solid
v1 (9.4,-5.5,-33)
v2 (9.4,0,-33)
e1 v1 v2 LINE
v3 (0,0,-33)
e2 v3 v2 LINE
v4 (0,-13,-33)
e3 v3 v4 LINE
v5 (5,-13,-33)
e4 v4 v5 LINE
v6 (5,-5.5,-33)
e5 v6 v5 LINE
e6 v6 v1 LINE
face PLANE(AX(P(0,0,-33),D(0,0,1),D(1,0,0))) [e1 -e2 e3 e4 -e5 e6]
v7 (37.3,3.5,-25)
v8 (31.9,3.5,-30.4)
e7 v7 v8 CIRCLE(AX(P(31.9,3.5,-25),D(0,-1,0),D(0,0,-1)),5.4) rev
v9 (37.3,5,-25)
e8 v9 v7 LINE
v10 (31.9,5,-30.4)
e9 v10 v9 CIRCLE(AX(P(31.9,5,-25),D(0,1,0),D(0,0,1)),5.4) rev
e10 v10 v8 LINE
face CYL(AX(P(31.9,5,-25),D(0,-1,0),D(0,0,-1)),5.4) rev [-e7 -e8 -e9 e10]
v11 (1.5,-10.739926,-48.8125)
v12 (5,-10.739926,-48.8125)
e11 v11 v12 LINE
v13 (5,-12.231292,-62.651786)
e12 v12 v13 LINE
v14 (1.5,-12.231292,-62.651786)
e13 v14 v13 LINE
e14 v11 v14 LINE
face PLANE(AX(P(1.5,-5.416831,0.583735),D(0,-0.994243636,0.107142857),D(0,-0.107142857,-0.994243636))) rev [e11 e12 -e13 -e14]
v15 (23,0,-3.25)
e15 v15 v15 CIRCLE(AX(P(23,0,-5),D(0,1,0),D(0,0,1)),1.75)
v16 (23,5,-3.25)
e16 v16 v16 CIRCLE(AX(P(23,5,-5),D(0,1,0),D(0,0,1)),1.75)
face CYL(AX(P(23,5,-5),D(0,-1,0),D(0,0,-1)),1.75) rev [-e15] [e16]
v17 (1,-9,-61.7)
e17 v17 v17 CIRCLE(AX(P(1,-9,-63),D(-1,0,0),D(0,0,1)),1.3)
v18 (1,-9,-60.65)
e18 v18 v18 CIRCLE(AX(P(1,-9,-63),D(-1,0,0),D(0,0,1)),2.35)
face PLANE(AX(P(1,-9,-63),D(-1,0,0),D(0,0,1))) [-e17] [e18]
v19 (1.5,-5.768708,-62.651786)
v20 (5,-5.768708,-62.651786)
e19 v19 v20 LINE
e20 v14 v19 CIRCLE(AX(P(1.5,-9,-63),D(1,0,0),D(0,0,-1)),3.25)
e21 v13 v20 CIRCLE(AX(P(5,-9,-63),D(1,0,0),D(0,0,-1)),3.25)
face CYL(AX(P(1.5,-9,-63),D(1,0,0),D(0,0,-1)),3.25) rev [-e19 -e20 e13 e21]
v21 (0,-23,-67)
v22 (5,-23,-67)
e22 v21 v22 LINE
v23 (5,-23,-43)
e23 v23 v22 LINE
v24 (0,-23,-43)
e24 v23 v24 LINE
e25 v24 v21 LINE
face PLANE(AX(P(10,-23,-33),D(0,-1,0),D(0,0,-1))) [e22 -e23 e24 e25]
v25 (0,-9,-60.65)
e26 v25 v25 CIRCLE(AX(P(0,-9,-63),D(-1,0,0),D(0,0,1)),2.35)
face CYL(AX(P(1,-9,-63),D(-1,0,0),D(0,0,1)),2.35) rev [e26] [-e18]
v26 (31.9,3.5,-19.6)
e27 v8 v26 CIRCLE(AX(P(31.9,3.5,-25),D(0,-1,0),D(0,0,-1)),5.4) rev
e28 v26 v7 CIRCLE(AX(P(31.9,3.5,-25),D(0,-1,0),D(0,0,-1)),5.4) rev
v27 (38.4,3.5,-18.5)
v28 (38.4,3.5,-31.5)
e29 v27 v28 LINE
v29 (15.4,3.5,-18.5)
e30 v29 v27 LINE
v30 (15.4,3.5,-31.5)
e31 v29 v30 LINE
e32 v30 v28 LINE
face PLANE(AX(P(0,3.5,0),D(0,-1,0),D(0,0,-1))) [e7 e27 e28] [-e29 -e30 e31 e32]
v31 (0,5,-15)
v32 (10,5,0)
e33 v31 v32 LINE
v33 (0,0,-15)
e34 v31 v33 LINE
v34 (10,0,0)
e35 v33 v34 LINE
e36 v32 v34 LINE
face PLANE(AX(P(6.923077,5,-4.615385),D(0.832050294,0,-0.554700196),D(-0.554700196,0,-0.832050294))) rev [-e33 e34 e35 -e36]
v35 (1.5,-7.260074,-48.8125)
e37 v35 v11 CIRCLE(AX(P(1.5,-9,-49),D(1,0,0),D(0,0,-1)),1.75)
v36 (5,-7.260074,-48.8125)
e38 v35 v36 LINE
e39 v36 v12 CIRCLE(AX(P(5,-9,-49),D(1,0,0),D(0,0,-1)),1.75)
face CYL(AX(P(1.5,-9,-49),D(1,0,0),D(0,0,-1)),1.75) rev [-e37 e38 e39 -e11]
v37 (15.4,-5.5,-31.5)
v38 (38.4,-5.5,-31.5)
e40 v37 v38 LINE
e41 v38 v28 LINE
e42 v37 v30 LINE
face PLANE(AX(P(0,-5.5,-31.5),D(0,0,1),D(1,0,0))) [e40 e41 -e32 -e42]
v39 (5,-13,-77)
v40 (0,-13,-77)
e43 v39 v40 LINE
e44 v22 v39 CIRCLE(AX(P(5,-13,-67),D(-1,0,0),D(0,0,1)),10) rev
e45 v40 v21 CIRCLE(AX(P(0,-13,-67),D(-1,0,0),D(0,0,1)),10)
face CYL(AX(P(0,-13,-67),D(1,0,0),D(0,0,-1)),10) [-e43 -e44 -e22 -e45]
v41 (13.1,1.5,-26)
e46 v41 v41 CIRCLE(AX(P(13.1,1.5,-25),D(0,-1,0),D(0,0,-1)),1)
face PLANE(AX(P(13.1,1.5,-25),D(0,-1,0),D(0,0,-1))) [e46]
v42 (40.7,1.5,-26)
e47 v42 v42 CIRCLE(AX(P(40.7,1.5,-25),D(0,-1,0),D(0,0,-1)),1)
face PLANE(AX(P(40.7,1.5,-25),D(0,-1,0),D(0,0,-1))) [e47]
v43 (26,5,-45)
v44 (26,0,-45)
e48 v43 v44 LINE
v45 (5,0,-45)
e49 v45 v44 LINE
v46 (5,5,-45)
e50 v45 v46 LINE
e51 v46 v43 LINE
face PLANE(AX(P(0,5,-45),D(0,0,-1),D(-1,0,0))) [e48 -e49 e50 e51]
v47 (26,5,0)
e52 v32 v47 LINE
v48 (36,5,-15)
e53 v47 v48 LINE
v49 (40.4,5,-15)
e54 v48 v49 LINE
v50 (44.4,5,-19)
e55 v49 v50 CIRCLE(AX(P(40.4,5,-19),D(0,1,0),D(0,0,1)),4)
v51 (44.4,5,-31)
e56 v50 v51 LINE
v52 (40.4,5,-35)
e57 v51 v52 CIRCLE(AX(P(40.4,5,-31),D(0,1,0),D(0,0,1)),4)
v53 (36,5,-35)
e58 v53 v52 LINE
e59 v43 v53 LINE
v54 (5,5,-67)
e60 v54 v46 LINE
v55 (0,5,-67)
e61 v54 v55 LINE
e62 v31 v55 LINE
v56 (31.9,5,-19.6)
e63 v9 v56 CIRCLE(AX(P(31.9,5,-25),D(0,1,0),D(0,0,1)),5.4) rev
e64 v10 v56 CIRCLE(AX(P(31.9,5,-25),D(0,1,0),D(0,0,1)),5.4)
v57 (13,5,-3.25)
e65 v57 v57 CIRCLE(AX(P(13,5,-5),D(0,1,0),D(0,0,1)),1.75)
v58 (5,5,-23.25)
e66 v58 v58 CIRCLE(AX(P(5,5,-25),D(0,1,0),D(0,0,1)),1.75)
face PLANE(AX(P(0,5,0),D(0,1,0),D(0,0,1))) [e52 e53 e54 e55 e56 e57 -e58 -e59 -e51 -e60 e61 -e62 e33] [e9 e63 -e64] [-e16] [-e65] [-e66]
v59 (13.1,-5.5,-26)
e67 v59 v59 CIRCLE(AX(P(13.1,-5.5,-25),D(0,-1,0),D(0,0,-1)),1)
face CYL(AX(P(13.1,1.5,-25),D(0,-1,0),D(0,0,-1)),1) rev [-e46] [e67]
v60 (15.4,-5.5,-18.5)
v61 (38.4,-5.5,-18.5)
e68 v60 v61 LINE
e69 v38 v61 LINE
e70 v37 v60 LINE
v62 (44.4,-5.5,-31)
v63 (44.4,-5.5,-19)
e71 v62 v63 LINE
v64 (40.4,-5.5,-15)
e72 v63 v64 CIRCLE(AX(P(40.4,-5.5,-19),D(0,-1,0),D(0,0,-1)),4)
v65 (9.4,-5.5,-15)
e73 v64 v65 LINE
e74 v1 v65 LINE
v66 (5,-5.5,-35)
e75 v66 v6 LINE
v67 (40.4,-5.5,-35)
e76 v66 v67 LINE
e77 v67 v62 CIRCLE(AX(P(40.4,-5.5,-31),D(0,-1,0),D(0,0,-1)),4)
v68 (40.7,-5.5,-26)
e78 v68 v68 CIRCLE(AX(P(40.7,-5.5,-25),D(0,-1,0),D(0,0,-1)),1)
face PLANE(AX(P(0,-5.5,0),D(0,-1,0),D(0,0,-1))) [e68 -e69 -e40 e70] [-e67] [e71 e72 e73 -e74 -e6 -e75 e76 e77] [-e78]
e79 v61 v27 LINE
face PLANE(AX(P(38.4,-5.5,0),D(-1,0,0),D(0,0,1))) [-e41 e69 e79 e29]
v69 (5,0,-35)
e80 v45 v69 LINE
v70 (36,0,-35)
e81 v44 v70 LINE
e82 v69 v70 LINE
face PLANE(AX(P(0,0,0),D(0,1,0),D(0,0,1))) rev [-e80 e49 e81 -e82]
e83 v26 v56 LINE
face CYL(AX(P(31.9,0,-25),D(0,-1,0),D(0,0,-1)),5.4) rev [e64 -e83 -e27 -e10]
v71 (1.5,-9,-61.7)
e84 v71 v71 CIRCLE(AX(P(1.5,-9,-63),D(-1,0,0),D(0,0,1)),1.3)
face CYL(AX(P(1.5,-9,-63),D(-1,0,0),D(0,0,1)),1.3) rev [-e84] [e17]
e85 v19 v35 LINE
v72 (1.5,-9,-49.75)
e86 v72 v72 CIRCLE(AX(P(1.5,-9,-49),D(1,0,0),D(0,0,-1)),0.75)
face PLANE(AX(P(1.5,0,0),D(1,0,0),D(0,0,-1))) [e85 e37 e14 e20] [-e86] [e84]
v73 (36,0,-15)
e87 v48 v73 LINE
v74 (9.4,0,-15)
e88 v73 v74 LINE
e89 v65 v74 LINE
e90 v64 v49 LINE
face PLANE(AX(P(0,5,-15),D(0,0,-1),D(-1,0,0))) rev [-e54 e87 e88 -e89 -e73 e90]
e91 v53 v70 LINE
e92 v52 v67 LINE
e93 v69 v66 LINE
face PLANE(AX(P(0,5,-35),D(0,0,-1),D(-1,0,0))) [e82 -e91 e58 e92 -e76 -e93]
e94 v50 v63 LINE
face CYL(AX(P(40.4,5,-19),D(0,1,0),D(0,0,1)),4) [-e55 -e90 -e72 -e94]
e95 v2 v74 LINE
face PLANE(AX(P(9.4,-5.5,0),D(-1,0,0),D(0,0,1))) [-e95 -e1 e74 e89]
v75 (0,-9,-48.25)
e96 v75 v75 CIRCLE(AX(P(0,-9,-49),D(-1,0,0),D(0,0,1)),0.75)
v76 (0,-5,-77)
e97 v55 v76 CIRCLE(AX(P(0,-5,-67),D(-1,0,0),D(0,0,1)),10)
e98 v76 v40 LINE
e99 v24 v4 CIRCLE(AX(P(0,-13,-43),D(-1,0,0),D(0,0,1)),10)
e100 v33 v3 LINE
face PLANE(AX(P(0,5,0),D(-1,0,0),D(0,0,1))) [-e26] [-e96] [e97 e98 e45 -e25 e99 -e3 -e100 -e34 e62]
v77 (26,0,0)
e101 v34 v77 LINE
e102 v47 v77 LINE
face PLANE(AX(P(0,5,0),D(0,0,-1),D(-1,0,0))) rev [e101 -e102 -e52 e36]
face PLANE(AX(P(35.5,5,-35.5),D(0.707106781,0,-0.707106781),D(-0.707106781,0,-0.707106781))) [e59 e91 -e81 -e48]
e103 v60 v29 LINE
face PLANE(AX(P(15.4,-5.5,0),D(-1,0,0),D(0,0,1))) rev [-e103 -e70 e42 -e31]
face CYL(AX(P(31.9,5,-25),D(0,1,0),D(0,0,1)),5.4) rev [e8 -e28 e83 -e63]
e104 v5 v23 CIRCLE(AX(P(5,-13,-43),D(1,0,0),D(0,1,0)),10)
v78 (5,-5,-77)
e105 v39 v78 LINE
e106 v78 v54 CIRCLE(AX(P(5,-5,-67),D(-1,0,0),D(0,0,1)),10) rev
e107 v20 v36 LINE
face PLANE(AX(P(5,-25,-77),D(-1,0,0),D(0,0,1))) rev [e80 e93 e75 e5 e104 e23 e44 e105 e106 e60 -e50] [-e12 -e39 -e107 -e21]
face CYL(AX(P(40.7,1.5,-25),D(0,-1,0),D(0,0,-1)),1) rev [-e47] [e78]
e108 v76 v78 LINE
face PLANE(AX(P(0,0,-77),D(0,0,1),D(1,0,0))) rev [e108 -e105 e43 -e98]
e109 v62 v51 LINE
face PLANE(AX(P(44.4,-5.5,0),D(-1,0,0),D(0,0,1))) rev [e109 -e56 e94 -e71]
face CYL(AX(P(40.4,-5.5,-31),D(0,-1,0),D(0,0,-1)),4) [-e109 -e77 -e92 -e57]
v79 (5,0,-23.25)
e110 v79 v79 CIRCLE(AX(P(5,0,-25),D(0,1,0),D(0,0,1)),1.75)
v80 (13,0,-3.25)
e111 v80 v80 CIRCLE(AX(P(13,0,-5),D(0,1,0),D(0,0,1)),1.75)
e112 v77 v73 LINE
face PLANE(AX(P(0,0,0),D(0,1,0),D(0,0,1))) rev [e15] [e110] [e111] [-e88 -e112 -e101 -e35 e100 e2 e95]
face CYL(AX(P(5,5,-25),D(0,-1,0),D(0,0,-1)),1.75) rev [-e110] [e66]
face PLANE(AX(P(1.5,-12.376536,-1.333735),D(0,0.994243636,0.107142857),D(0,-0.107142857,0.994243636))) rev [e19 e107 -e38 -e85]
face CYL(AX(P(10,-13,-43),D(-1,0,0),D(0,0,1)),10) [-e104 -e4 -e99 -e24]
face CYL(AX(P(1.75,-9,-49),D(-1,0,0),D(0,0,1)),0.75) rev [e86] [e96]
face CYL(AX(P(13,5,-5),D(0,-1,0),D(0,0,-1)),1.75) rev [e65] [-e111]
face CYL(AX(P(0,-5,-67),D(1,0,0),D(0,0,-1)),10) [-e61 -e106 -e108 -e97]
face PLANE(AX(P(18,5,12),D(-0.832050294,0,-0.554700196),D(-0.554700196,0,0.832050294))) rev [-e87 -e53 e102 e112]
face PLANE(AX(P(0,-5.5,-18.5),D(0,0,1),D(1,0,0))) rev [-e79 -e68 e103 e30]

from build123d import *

# Parameters (mm, degrees)
SKETCH1_R                = 1.75
SKETCH1_W                = 7.2
SKETCH1_H                = 5.4
BOSS_EXTRUDE1_DEPTH      = 5
FILLET5_RADIUS           = 10
FILLET5_LENGTH           = 5
FILLET2_R                = 5.4
FILLET6_R                = 5.4
SKETCH3_W                = 6
SKETCH3_H                = 13
BOSS_EXTRUDE4_DEPTH      = 5.5
SKETCH5_W                = 23
SKETCH5_H                = 13
CUT_EXTRUDE1_DEPTH       = 3.5
CUT_EXTRUDE2_DEPTH       = 76.201396264
FILLET9_R                = 4
BOSS_EXTRUDE7_DEPTH      = 32
BOSS_EXTRUDE7_DEPTH_BACK = 12
SKETCH7_W                = 10
SKETCH7_H                = 28
FILLET10_R               = 10
SKETCH9_R                = 1
CUT_EXTRUDE4_DEPTH       = 7
SKETCH15_W               = 5
SKETCH15_H               = 32
CUT_EXTRUDE7_DEPTH       = 30
CUT_EXTRUDE8_DEPTH       = 5
CUT_EXTRUDE9_DEPTH       = 3.5
SKETCH22_R               = 1.3
CUT_EXTRUDE10_DEPTH      = 1.5
SKETCH22_3_R             = 2.35
SKETCH22_3_R_2           = 1.3
CUT_EXTRUDE11_DEPTH      = 1
SKETCH23_R               = 0.75
CUT_EXTRUDE12_DEPTH      = 1.75


with BuildPart() as part:
    # Sketch1 → Boss-Extrude1 (new body)
    # profile 1 of 4: a face of its own
    with BuildSketch(Plane(origin=(0, 0, 0), x_dir=(1, 0, 0), z_dir=(0, 1, 0))):
        with BuildLine():
            Line((3.25, 25), (0, 25))
            Line((0, 25), (0, 15))
            Line((0, 15), (10, 0))
            Line((10, 0), (26, 0))
            Line((26, 0), (36, 15))
            Line((36, 15), (60, 15))
            Line((60, 15), (60, 25))
            Line((60, 25), (44.5, 25))
            Line((44.5, 25), (44.5, 19.6))
            Line((44.5, 19.6), (37.3, 19.6))
            Line((37.3, 19.6), (26.5, 19.6))
            Line((26.5, 19.6), (26.5, 25))
            Line((26.5, 25), (6.75, 25))
            ThreePointArc((6.75, 25), (5, 23.25), (3.25, 25))
        make_face()
        with Locations(Location((13, 5, 0), (0, 0, 270))):
            Circle(SKETCH1_R, mode=Mode.SUBTRACT)
        with Locations(Location((23, 5, 0), (0, 0, 270))):
            Circle(SKETCH1_R, mode=Mode.SUBTRACT)
    # profile 2 of 4: a face of its own
    with BuildSketch(Plane(origin=(0, 0, 0), x_dir=(1, 0, 0), z_dir=(0, 1, 0))):
        with BuildLine():
            Line((10, 45), (0, 33.819660113))
            Line((0, 33.819660113), (0, 25))
            Line((0, 25), (3.25, 25))
            ThreePointArc((3.25, 25), (5, 26.75), (6.75, 25))
            Line((6.75, 25), (26.5, 25))
            Line((26.5, 25), (26.5, 30.4))
            Line((26.5, 30.4), (37.3, 30.4))
            Line((37.3, 30.4), (44.5, 30.4))
            Line((44.5, 30.4), (44.5, 25))
            Line((44.5, 25), (60, 25))
            Line((60, 25), (60, 35))
            Line((60, 35), (36, 35))
            Line((36, 35), (26, 45))
            Line((26, 45), (10, 45))
        make_face()
    # profile 3 of 4: a face of its own
    with BuildSketch(Plane(origin=(0, 0, 0), x_dir=(1, 0, 0), z_dir=(0, 1, 0))):
        with Locations((40.9, 27.7)):
            Rectangle(SKETCH1_W, SKETCH1_H)
    # profile 4 of 4: a face of its own
    with BuildSketch(Plane(origin=(0, 0, 0), x_dir=(1, 0, 0), z_dir=(0, 1, 0))):
        with Locations((40.9, 22.3)):
            Rectangle(SKETCH1_W, SKETCH1_H)
    extrude(amount=BOSS_EXTRUDE1_DEPTH)

    # Fillet5: full round fillet: the end face becomes a half cylinder, R = half its width
    fillet5_face = Plane((60, 2.5, -25), x_dir=(0, -1, 0), z_dir=(1, 0, 0))  # on the end face: x along it, z out of the body
    fillet5_slab = fillet5_face.offset(-FILLET5_RADIUS / 2) * Box(FILLET5_LENGTH, 2 * FILLET5_RADIUS, FILLET5_RADIUS, mode=Mode.PRIVATE)  # the body's end, R deep
    fillet5_round = Plane((50, 2.5, -25), x_dir=(1, 0, 0), z_dir=(0, -1, 0)) * Cylinder(FILLET5_RADIUS, FILLET5_LENGTH, mode=Mode.PRIVATE)  # its axis R under the face
    add(fillet5_slab - fillet5_round, mode=Mode.SUBTRACT)

    # Fillet2
    fillet2_edges = [part.edges().sort_by_distance(p)[0] for p in [
        (26.5, 2.5, -30.4),
        (26.5, 2.5, -19.6),
    ]]
    fillet(fillet2_edges, radius=FILLET2_R - 0.0001)  # a hair under: the kernel refuses the full size

    # Fillet6
    fillet6_edges = [part.edges().sort_by_distance(p)[0] for p in [
        (37.3, 2.5, -19.6),
        (37.3, 2.5, -30.4),
    ]]
    fillet(fillet6_edges, radius=FILLET6_R - 0.0001)  # a hair under: the kernel refuses the full size

    # Sketch3 → Boss-Extrude4 (add)
    with BuildSketch(Plane.XZ):
        with Locations((12.4, -25)):
            Rectangle(SKETCH3_W, SKETCH3_H)
        Polygon((38.4, -25), (38.4, -31.5), (44.4, -31.5), (44.4, -18.5), (38.4, -18.5), align=None)
        Polygon((31.9, -31.5), (15.4, -31.5), (9.4, -31.5), (9.4, -35), (36, -35), (44.4, -35), (44.4, -31.5), (38.4, -31.5), align=None)
        Polygon((9.4, -18.5), (15.4, -18.5), (31.9, -18.5), (38.4, -18.5), (44.4, -18.5), (44.4, -15), (36, -15), (9.4, -15), align=None)
    extrude(amount=BOSS_EXTRUDE4_DEPTH)

    # Sketch5 → Cut-Extrude1 (cut)
    with BuildSketch(Plane.XZ):
        with Locations((26.9, -25)):
            Rectangle(SKETCH5_W, SKETCH5_H)
    extrude(amount=-CUT_EXTRUDE1_DEPTH, mode=Mode.SUBTRACT)

    # Sketch6 → Cut-Extrude2 (cut, through all)
    with BuildSketch(Plane.XZ):
        with BuildLine():
            Line((44.4, -15), (44.4, -35))
            Line((44.4, -35), (50, -35))
            ThreePointArc((50, -35), (60, -25), (50, -15))
            Line((50, -15), (44.4, -15))
        make_face()
    extrude(amount=-CUT_EXTRUDE2_DEPTH, mode=Mode.SUBTRACT)

    # Fillet9
    fillet9_edges = [part.edges().sort_by_distance(p)[0] for p in [
        (44.4, -0.25, -35),
        (44.4, -0.25, -15),
    ]]
    fillet(fillet9_edges, radius=FILLET9_R)

    # Sketch7 → Boss-Extrude7 (add, two sides: drawn at the far end of the back side and taken through both)
    with BuildSketch(Plane(origin=(0, 0, -45), x_dir=(-1, 0, 0), z_dir=(0, 0, -1)).offset(-BOSS_EXTRUDE7_DEPTH_BACK)):
        with Locations((-5, -9)):
            Rectangle(SKETCH7_W, SKETCH7_H)
    extrude(amount=BOSS_EXTRUDE7_DEPTH + BOSS_EXTRUDE7_DEPTH_BACK)

    # Fillet10
    fillet10_edges = [part.edges().sort_by_distance(p)[0] for p in [
        (5, 5, -77),
        (5, -23, -33),
        (5, -23, -77),
    ]]
    fillet(fillet10_edges, radius=FILLET10_R)

    # Sketch9 → Cut-Extrude4 (cut)
    with BuildSketch(Plane.XZ.offset(5.5)):
        with Locations(Location((13.1, -25, 0), (0, 0, 270))):
            Circle(SKETCH9_R)
        with Locations(Location((40.7, -25, 0), (0, 0, 270))):
            Circle(SKETCH9_R)
    extrude(amount=-CUT_EXTRUDE4_DEPTH, mode=Mode.SUBTRACT)

    # Sketch15 → Cut-Extrude7 (cut)
    with BuildSketch(Plane(origin=(0, 5, 0), x_dir=(1, 0, 0), z_dir=(0, 1, 0))):
        with Locations((7.5, 61)):
            Rectangle(SKETCH15_W, SKETCH15_H)
    extrude(amount=-CUT_EXTRUDE7_DEPTH, mode=Mode.SUBTRACT)

    # Sketch17 → Cut-Extrude8 (cut)
    with BuildSketch(Plane(origin=(10, 0, 0), x_dir=(0, 0, -1), z_dir=(1, 0, 0))):
        with BuildLine():
            Line((45, -23), (45, 0))
            Line((45, 0), (35, 0))
            Line((35, 0), (35, -5.5))
            Line((35, -5.5), (33, -5.5))
            Line((33, -5.5), (33, -13))
            ThreePointArc((33, -13), (35.928932188, -20.071067812), (43, -23))
            Line((43, -23), (45, -23))
        make_face()
    extrude(amount=-CUT_EXTRUDE8_DEPTH, mode=Mode.SUBTRACT)

    # Sketch8 → Cut-Extrude9 (cut)
    with BuildSketch(Plane(origin=(5, 0, 0), x_dir=(0, 0, -1), z_dir=(1, 0, 0))):
        with BuildLine():
            Line((62.651785714, -5.768708182), (48.8125, -7.260073637))
            ThreePointArc((48.8125, -7.260073637), (47.25, -9), (48.8125, -10.739926363))
            Line((48.8125, -10.739926363), (62.651785714, -12.231291818))
            ThreePointArc((62.651785714, -12.231291818), (66.25, -9), (62.651785714, -5.768708182))
        make_face()
    extrude(amount=-CUT_EXTRUDE9_DEPTH, mode=Mode.SUBTRACT)

    # Sketch22 → Cut-Extrude10 (cut)
    with BuildSketch(Plane.ZY):
        with Locations((-63, -9)):
            Circle(SKETCH22_R)
    extrude(amount=-CUT_EXTRUDE10_DEPTH, mode=Mode.SUBTRACT)

    # Sketch22<3> → Cut-Extrude11 (cut)
    with BuildSketch(Plane.ZY):
        with Locations((-63, -9)):
            Circle(SKETCH22_3_R)
        with Locations((-63, -9)):
            Circle(SKETCH22_3_R_2, mode=Mode.SUBTRACT)
    extrude(amount=-CUT_EXTRUDE11_DEPTH, mode=Mode.SUBTRACT)

    # Sketch23 → Cut-Extrude12 (cut)
    with BuildSketch(Plane.ZY):
        with Locations((-49, -9)):
            Circle(SKETCH23_R)
    extrude(amount=-CUT_EXTRUDE12_DEPTH, mode=Mode.SUBTRACT)


solid = part.part
